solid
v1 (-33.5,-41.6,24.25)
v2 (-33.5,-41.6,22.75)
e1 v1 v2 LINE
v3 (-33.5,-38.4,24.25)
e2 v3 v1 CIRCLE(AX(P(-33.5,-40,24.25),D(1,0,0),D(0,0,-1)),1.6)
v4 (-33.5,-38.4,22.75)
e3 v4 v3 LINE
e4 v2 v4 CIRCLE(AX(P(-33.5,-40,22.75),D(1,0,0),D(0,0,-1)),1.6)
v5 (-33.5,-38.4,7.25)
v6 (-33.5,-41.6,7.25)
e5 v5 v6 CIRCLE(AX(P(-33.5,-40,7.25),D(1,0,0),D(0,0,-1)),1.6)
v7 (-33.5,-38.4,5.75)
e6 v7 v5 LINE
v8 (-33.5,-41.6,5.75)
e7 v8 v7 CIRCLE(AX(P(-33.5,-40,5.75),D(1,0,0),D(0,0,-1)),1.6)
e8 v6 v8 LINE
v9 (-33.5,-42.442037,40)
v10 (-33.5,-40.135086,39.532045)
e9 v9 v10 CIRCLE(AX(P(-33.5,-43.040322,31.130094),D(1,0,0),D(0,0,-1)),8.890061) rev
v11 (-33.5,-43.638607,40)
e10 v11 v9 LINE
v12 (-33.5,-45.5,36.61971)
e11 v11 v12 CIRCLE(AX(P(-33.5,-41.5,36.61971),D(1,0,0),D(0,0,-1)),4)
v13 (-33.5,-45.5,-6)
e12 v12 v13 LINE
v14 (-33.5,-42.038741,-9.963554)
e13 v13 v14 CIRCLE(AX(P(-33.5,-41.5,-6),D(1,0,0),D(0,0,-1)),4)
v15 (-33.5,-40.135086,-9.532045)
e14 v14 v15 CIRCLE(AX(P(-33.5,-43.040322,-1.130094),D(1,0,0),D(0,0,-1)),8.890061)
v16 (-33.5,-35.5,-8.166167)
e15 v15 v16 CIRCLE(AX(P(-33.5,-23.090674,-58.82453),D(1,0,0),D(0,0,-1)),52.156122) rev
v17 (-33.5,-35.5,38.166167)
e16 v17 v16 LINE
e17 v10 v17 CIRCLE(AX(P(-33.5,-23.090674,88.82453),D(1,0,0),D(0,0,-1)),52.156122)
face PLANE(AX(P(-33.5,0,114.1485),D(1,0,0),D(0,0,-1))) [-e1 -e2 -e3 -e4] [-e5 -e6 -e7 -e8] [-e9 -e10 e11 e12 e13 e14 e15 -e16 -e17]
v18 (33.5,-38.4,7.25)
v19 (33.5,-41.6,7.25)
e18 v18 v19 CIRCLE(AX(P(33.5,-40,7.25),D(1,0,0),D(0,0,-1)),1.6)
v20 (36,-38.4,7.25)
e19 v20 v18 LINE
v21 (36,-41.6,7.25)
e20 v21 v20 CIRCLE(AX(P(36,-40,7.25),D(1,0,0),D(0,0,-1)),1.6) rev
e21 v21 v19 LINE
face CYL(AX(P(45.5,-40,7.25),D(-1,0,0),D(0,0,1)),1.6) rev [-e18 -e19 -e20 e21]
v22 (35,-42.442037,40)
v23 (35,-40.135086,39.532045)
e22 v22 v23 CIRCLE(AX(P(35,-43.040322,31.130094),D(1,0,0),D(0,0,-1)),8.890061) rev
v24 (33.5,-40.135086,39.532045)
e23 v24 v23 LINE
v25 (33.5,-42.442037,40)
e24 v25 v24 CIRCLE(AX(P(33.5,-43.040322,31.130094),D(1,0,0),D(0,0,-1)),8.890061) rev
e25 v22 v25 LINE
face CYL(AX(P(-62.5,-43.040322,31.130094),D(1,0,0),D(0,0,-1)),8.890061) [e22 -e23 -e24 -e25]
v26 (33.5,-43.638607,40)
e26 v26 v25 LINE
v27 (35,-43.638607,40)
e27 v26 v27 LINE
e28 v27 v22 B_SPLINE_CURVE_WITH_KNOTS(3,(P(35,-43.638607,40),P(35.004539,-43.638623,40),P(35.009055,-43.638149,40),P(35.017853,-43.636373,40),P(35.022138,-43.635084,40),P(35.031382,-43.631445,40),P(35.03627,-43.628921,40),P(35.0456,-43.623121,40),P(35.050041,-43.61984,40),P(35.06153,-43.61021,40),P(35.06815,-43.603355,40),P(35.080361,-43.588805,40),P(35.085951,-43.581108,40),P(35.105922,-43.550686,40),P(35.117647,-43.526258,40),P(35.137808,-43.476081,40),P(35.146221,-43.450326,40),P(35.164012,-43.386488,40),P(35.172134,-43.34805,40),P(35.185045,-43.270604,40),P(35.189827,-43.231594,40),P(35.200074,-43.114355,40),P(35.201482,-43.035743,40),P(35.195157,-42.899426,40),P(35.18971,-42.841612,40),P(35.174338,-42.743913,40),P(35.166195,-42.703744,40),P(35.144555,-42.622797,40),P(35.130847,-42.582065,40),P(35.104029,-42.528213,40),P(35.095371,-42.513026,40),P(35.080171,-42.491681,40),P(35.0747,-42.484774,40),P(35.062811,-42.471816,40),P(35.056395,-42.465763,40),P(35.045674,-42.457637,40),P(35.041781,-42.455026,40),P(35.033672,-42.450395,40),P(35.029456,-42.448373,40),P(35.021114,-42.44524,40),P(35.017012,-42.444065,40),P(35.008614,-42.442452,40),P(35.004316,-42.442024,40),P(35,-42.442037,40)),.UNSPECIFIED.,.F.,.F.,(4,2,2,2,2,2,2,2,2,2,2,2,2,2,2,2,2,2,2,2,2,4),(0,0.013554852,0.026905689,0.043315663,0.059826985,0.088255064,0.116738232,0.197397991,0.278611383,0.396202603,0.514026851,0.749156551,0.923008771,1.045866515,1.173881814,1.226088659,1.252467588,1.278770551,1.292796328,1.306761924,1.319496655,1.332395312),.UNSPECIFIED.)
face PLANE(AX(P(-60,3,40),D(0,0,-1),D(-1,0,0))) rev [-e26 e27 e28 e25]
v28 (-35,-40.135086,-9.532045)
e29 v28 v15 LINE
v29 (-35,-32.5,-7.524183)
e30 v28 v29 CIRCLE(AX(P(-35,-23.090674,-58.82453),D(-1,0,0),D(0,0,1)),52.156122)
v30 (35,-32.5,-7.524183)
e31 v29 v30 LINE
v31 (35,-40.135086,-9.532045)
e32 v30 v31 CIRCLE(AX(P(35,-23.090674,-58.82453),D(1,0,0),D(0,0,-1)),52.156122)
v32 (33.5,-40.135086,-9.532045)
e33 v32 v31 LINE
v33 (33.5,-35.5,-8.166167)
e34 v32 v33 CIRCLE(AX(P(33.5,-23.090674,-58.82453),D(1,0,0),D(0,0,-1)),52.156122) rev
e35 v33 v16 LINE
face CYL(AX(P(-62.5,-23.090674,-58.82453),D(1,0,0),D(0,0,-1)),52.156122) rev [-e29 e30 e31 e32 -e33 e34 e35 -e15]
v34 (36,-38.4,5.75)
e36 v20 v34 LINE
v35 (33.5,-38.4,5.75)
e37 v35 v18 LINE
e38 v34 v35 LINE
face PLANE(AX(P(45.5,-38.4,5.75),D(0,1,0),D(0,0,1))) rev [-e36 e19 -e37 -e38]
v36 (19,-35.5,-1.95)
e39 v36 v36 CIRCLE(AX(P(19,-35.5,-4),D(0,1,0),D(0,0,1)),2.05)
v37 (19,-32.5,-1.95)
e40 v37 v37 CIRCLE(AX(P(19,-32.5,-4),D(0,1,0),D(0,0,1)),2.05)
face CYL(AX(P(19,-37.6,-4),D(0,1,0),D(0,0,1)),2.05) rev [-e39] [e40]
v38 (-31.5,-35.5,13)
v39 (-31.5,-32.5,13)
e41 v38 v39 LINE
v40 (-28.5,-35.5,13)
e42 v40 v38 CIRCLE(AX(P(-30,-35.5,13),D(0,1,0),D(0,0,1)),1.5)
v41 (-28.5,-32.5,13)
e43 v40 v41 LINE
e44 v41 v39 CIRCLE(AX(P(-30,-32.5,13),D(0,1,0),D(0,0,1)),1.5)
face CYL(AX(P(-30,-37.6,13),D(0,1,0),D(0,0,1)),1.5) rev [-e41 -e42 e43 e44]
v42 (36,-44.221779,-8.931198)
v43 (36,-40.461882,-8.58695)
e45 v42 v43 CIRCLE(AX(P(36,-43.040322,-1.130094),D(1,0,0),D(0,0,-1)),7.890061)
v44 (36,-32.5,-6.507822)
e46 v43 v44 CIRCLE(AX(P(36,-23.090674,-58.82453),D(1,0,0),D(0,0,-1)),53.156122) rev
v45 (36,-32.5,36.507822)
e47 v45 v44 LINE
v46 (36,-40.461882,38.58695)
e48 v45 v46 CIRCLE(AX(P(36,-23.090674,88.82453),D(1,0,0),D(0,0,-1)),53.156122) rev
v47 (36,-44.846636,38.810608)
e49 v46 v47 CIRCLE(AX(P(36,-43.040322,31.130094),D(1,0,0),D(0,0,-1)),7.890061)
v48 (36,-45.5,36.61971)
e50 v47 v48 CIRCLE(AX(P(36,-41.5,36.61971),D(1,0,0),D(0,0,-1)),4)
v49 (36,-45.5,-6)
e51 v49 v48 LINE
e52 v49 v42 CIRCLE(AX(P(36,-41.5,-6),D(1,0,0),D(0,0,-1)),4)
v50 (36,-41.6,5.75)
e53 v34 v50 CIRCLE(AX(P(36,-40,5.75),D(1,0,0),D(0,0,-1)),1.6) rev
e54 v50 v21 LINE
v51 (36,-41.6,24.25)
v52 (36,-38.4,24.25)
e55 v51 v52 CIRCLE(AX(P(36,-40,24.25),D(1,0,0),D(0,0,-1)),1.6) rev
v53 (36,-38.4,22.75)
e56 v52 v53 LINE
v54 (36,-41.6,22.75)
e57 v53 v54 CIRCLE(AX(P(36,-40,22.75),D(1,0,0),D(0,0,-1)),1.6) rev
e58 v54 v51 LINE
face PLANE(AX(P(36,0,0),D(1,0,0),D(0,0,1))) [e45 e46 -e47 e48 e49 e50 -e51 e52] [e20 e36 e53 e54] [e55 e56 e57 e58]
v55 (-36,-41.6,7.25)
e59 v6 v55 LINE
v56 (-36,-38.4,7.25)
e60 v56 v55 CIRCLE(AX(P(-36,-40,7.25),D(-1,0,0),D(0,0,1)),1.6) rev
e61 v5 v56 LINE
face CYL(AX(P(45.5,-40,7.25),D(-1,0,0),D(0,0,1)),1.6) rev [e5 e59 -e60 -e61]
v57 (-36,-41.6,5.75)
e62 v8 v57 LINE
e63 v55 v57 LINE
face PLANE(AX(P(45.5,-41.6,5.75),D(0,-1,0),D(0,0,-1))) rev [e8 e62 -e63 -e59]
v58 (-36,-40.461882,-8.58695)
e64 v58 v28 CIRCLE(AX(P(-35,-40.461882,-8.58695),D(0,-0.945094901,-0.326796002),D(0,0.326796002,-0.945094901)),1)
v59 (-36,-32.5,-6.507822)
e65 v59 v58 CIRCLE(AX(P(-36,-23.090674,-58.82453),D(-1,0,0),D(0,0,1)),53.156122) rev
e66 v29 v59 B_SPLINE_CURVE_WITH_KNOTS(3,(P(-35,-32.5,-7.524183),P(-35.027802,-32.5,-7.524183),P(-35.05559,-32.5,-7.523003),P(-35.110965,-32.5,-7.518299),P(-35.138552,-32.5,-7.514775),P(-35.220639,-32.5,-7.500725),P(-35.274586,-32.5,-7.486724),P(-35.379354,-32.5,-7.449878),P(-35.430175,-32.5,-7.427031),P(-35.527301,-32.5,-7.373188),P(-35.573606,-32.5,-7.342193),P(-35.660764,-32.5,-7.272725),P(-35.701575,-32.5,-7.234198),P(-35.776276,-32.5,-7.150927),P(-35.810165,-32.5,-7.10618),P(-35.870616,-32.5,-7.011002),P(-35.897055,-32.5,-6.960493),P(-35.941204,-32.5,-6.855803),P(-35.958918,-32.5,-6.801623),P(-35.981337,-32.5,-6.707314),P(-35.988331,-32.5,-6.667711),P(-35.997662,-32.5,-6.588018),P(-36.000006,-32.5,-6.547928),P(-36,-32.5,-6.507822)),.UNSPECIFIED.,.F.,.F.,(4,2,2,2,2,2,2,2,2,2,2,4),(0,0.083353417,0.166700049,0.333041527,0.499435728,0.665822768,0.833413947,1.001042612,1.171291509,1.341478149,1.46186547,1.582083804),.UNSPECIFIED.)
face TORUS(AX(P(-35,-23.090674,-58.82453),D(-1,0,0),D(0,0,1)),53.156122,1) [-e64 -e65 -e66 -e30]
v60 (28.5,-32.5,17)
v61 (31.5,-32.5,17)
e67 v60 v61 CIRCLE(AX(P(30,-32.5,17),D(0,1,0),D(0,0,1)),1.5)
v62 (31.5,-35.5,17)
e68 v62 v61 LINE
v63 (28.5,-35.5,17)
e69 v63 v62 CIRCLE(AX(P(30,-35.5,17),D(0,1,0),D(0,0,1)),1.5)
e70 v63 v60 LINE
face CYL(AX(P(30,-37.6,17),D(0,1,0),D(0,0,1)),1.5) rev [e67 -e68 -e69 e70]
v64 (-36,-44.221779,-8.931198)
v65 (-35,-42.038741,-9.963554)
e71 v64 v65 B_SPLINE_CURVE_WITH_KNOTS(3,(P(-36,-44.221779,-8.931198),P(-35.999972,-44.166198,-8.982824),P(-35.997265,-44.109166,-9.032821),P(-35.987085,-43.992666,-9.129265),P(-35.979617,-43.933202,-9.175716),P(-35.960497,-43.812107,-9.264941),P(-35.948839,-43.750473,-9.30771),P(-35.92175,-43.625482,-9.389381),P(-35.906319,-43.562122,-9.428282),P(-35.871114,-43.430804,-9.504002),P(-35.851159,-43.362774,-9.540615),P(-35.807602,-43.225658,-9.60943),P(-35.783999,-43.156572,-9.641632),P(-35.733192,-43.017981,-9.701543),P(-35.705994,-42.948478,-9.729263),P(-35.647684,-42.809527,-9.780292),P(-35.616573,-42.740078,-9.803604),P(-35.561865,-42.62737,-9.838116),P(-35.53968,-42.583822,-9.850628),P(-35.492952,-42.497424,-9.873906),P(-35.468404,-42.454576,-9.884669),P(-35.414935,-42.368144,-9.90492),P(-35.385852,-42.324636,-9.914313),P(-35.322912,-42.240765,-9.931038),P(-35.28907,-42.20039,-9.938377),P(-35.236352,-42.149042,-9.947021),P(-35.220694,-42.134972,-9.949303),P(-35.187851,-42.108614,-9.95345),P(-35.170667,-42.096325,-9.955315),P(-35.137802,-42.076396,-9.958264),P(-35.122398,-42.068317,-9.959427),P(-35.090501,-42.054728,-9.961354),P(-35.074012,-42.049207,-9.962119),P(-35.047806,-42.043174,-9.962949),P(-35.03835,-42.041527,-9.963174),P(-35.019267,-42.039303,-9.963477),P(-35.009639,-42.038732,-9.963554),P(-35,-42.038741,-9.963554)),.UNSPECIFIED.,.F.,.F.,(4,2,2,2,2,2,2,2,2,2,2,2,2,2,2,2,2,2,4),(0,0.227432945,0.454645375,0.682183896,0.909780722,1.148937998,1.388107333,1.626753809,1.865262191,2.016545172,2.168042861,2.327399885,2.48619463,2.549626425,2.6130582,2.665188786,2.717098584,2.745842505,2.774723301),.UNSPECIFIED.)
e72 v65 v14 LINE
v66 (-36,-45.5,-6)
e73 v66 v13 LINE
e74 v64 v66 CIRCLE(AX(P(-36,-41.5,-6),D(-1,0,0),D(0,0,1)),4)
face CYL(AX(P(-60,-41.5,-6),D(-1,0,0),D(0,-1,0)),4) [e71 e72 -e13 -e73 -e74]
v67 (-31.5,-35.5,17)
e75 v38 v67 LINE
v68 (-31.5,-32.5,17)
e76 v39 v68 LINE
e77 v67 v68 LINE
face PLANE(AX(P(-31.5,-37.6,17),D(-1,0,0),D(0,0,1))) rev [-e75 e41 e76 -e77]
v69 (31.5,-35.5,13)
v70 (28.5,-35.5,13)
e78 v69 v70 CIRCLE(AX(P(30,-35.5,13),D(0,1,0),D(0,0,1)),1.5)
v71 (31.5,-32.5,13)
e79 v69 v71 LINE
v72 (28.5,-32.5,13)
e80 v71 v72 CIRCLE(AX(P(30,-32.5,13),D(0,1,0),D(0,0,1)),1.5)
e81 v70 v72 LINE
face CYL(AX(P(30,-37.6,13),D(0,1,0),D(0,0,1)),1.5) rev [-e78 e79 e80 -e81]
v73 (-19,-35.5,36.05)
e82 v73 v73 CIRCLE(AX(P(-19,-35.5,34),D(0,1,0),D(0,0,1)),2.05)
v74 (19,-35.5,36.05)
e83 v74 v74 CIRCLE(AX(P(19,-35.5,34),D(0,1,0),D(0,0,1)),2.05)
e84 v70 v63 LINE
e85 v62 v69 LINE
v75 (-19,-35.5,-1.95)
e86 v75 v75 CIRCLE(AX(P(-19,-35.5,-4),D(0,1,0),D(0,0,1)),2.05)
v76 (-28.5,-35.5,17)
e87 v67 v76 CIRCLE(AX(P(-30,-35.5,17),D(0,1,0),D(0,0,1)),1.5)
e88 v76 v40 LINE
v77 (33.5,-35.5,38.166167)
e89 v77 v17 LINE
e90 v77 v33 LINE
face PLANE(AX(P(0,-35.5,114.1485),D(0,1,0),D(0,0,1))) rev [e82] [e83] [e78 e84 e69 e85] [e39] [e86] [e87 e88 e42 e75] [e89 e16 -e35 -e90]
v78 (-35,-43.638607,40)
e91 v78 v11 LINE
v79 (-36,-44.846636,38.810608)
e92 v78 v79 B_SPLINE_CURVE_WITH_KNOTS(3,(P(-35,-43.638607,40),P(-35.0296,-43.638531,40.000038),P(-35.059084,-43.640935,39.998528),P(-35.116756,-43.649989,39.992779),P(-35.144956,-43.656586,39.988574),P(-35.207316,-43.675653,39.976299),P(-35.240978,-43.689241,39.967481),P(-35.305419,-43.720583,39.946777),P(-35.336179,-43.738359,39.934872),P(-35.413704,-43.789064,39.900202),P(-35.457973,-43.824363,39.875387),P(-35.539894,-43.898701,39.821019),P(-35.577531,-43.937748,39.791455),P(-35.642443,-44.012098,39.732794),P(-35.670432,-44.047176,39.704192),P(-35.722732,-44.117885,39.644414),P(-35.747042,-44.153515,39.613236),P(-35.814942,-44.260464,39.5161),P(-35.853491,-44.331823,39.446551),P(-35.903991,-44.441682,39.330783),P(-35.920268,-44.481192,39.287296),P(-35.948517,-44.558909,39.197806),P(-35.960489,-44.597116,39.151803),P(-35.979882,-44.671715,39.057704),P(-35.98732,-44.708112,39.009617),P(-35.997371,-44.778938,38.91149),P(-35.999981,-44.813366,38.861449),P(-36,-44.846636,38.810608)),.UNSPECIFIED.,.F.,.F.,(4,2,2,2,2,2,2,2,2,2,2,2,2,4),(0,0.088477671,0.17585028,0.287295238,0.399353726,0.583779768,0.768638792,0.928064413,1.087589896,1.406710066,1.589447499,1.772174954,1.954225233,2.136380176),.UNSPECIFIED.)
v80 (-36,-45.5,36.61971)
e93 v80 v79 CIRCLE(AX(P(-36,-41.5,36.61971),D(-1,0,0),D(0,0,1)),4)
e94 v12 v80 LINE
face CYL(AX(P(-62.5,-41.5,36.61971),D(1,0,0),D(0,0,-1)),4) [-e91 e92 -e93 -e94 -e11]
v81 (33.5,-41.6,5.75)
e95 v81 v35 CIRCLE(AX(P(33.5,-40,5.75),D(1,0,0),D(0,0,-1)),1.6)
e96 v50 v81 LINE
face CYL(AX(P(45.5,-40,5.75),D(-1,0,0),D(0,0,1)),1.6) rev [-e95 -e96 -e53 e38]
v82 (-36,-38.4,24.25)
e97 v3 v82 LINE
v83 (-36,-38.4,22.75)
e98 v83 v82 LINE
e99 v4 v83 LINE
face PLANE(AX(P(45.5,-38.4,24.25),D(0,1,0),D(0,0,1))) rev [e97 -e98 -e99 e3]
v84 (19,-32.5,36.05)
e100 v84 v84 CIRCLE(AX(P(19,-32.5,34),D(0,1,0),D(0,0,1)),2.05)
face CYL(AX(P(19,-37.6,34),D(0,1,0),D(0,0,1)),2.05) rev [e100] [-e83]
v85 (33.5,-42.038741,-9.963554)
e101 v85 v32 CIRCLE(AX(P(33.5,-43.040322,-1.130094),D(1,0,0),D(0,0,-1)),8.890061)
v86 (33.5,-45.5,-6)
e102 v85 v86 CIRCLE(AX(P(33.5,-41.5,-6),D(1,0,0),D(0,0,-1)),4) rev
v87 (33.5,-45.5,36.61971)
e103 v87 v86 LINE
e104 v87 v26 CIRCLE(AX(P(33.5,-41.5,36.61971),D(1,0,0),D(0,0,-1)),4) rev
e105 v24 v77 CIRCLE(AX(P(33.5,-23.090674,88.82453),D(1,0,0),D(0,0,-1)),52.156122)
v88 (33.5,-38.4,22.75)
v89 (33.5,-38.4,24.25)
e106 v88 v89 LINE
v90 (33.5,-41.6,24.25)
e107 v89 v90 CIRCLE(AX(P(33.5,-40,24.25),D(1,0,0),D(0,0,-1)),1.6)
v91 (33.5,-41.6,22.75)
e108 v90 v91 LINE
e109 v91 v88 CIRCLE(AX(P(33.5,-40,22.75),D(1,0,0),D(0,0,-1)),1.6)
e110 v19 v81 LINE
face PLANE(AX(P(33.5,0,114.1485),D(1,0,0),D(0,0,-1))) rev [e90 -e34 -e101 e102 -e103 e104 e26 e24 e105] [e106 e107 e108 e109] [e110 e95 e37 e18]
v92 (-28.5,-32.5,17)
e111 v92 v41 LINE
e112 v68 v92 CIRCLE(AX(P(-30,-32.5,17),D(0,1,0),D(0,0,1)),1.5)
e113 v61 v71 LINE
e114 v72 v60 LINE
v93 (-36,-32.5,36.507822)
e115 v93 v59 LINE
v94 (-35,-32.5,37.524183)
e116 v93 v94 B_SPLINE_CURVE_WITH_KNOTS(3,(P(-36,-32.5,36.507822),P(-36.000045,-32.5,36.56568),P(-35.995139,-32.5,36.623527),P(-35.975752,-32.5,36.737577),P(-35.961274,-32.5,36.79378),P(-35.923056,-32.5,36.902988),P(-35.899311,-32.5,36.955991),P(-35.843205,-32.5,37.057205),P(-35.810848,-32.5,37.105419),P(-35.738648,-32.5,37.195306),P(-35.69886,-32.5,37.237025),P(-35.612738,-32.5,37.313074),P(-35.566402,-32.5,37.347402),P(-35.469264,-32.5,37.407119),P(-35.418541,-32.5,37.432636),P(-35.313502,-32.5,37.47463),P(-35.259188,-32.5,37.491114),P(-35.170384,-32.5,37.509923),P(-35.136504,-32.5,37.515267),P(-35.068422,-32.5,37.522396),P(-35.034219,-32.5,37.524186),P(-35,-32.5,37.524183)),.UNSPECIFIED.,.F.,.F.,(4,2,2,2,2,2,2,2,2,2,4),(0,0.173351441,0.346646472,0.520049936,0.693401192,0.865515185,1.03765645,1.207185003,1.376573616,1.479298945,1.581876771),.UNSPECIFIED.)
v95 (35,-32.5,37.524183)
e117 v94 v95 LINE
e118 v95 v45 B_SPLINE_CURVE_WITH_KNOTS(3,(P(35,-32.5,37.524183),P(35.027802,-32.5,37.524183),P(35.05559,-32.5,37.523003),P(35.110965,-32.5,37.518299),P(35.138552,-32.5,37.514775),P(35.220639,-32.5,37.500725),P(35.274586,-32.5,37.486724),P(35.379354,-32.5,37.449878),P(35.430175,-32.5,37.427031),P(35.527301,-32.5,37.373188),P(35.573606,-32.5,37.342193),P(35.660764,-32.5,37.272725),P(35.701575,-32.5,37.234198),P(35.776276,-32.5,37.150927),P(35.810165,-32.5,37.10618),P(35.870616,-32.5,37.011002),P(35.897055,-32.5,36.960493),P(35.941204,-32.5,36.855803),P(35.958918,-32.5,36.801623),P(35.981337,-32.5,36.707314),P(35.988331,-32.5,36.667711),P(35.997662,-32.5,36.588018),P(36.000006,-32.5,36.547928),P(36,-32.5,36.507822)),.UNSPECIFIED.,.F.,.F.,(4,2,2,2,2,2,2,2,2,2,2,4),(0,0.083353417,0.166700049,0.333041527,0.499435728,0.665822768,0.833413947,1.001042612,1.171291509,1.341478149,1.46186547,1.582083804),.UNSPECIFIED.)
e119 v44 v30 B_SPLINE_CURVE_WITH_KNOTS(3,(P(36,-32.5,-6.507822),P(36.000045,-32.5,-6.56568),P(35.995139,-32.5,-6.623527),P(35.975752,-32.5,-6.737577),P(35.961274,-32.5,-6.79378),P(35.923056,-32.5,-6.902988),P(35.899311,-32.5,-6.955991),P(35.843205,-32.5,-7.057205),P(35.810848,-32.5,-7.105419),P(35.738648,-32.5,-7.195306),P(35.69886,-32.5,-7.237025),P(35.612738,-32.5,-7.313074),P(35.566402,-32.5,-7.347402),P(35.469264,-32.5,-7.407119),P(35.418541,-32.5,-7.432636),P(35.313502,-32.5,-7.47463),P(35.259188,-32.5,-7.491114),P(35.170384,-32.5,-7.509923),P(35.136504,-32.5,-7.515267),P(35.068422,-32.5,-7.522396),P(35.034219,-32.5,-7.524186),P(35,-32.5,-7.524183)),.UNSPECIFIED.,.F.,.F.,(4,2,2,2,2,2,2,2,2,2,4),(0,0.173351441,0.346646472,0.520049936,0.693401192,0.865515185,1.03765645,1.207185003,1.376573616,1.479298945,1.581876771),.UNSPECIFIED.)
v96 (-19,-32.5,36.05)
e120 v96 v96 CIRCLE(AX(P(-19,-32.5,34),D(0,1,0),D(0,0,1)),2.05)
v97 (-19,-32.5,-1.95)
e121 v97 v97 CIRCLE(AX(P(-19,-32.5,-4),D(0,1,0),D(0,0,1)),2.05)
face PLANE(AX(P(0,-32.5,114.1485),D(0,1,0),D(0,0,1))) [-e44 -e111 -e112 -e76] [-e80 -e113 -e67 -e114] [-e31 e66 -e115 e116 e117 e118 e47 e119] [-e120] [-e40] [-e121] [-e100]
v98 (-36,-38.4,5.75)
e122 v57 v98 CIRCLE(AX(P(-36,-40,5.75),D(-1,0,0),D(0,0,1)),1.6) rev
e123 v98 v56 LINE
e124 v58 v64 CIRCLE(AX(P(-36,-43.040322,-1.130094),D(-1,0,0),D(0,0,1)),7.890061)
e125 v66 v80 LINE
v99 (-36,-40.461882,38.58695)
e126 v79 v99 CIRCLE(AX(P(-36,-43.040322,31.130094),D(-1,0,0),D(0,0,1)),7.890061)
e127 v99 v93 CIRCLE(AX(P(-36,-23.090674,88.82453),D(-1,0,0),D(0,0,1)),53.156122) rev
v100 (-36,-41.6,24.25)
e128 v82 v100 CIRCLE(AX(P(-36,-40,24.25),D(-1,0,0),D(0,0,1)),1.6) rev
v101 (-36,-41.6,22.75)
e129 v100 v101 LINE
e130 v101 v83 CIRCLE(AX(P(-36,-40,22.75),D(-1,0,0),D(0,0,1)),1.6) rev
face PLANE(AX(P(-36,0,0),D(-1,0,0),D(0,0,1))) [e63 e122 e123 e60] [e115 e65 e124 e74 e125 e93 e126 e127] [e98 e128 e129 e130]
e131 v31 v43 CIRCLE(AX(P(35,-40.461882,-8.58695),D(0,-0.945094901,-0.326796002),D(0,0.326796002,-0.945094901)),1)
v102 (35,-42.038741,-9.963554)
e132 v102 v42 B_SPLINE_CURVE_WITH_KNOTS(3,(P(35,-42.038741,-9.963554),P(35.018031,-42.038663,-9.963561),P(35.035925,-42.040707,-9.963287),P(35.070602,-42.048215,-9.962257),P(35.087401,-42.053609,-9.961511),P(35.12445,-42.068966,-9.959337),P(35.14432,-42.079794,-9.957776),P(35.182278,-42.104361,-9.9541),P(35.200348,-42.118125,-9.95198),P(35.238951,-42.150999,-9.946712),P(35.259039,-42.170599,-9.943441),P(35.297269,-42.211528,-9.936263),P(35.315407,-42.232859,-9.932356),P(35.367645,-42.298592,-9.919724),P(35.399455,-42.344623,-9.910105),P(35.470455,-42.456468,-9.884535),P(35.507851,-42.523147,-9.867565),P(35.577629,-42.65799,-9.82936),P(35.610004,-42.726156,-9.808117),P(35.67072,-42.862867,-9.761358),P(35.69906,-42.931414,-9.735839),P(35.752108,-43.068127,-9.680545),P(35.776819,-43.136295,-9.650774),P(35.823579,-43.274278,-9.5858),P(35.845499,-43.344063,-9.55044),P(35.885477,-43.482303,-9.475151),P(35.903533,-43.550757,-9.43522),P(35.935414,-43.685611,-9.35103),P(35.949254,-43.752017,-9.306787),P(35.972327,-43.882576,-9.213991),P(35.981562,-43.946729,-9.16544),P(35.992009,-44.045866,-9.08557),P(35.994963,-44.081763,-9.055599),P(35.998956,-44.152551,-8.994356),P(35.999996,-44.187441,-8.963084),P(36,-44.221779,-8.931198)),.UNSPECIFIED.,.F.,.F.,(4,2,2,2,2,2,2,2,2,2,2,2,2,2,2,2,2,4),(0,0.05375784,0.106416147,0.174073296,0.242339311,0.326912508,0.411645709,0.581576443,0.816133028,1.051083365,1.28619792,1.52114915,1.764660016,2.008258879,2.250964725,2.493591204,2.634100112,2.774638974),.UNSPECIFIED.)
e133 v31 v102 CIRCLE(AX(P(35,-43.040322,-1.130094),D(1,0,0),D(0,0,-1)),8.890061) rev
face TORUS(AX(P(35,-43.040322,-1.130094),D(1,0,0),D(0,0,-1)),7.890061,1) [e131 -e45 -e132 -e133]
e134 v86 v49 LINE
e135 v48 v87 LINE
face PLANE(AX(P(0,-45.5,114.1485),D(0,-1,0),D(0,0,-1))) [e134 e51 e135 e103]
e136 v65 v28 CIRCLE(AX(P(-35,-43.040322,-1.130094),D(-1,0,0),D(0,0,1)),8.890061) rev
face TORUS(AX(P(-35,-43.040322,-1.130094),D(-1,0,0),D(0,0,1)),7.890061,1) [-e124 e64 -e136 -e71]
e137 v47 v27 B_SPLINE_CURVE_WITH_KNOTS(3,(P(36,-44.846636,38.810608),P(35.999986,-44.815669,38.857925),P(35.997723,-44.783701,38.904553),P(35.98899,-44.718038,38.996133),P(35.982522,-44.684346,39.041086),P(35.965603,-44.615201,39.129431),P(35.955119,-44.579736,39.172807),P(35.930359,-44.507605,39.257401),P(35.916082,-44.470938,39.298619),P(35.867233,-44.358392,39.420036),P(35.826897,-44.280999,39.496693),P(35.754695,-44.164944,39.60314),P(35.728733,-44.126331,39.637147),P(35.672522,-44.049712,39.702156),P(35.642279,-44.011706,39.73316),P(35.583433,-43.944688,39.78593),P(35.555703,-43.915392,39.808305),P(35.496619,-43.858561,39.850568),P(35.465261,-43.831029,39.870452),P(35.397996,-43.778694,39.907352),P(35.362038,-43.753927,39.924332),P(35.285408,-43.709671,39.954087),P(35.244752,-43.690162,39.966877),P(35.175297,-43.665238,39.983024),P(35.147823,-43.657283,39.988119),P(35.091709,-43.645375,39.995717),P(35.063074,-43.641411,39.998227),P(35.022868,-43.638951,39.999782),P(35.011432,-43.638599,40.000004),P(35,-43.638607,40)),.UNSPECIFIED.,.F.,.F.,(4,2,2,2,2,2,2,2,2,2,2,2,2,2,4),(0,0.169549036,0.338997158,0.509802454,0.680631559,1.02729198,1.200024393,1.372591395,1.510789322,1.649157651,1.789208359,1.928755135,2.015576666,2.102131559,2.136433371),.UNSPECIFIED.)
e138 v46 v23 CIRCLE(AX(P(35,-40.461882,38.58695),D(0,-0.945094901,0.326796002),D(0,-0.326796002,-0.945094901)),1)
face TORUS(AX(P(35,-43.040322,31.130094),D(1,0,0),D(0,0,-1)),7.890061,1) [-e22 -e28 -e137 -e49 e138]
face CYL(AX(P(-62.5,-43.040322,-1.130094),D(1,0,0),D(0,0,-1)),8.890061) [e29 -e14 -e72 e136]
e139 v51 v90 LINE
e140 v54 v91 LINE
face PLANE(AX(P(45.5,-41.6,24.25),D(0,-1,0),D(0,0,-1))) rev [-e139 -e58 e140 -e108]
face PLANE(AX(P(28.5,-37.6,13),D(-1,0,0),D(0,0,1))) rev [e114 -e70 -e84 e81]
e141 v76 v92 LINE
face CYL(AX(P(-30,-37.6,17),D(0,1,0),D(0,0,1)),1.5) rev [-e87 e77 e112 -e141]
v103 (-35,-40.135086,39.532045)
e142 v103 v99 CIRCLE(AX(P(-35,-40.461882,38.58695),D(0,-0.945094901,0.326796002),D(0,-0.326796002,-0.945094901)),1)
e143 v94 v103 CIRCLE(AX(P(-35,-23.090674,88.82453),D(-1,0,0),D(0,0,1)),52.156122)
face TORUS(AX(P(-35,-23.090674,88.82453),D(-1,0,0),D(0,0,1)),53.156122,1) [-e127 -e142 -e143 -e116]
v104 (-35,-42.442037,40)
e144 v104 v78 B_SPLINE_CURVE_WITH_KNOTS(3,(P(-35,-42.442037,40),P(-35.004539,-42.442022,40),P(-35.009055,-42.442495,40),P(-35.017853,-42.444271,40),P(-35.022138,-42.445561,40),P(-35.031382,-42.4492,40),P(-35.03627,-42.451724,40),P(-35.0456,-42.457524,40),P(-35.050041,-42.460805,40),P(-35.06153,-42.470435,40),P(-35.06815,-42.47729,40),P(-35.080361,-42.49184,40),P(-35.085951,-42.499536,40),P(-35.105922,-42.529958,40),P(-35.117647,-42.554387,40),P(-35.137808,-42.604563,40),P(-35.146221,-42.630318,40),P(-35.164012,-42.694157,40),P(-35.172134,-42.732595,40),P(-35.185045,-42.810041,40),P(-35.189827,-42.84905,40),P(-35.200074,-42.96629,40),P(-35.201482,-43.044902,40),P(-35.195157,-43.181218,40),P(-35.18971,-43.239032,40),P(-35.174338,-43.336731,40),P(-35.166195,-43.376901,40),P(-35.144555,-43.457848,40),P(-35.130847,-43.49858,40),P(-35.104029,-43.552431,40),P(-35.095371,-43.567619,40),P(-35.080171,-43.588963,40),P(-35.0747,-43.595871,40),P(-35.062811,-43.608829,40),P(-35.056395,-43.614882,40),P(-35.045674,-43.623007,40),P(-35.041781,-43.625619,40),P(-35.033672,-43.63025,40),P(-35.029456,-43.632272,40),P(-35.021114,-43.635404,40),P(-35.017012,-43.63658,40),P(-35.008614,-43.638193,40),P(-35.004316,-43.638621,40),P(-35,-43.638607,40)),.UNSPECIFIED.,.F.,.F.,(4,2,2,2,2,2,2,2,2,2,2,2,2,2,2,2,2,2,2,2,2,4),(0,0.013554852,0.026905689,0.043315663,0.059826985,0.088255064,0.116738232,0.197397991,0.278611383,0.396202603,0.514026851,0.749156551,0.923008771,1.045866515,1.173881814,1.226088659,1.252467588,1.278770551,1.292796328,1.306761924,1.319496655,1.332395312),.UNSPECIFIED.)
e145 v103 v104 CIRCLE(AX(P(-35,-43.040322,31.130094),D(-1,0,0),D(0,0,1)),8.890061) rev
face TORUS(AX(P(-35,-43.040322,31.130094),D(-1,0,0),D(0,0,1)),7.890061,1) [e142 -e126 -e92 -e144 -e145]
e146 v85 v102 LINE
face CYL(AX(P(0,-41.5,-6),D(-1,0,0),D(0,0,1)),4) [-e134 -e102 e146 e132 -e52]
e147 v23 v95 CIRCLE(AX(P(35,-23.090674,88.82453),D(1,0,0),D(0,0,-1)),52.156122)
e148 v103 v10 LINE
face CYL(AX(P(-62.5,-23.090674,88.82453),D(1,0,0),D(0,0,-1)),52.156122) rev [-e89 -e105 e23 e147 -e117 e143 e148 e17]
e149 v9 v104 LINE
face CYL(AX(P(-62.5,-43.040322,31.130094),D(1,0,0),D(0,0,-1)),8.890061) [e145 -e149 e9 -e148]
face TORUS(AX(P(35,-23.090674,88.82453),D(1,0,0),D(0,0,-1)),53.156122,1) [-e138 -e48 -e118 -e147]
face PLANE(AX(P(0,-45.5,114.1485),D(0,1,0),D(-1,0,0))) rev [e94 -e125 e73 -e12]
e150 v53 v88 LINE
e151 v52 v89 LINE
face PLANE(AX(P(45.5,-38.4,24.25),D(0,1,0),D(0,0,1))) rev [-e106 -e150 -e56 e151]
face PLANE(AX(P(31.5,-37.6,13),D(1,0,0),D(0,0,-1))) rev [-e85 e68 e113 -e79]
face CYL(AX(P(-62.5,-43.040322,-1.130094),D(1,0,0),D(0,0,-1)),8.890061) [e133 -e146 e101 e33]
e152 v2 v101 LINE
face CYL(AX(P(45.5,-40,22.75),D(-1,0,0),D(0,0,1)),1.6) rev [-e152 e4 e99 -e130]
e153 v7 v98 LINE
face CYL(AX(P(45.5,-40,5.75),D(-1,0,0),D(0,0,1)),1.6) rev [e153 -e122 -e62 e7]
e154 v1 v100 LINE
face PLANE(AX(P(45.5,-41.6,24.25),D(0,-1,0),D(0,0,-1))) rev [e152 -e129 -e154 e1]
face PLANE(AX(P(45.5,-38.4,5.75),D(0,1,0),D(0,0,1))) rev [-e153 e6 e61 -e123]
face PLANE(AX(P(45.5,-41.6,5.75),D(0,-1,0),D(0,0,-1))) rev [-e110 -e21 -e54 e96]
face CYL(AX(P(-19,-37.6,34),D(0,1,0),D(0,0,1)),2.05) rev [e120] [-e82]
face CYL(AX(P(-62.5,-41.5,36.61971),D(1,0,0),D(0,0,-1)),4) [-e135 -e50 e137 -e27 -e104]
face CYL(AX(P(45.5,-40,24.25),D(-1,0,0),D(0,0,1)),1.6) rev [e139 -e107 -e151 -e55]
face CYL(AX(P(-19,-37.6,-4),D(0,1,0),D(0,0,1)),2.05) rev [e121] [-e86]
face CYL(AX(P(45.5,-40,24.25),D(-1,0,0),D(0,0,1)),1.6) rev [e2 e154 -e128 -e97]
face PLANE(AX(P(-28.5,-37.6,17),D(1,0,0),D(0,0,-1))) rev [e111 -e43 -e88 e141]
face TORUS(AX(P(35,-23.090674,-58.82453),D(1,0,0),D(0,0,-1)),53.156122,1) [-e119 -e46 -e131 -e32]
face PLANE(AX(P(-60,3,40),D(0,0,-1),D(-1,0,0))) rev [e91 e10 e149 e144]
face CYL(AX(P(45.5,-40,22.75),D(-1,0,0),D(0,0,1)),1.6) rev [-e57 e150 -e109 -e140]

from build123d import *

# Parameters (mm, degrees)
BOSS_EXTRUDE1_DEPTH      = 40
BOSS_EXTRUDE1_DEPTH_BACK = 10
SKETCH1_W                = 73
SKETCH1_H                = 3
SKETCH1_W_2              = 3
SKETCH1_H_2              = 10
SKETCH5_R                = 2.05
CUT_EXTRUDE2_DEPTH       = 5.1
CUT_EXTRUDE3_DEPTH       = 82
SKETCH9_W                = 50
SKETCH9_H                = 13
CUT_EXTRUDE4_DEPTH       = 0.5
CUT_EXTRUDE5_DEPTH       = 98.5
FILLET2_R                = 4
FILLET3_R                = 1


with BuildPart() as part:
    # Sketch1 → Boss-Extrude1 (new, two sides: drawn at the far end of the back side and taken through both)
    with BuildSketch(Plane.XY.offset(-BOSS_EXTRUDE1_DEPTH_BACK)):
        with Locations((0, -34)):
            Rectangle(SKETCH1_W, SKETCH1_H)
        with Locations((35, -40.5)):
            Rectangle(SKETCH1_W_2, SKETCH1_H_2)
        with Locations((-35, -40.5)):
            Rectangle(SKETCH1_W_2, SKETCH1_H_2)
    extrude(amount=BOSS_EXTRUDE1_DEPTH + BOSS_EXTRUDE1_DEPTH_BACK)

    # Sketch5 → Cut-Extrude2 (cut)
    with BuildSketch(Plane(origin=(0, -32.5, 0), x_dir=(1, 0, 0), z_dir=(0, 1, 0))):
        with Locations(Location((-19, 4, 0), (0, 0, 270))):
            Circle(SKETCH5_R)
        with Locations(Location((19, 4, 0), (0, 0, 270))):
            Circle(SKETCH5_R)
        with Locations(Location((19, -34, 0), (0, 0, 270))):
            Circle(SKETCH5_R)
        with Locations(Location((-19, -34, 0), (0, 0, 270))):
            Circle(SKETCH5_R)
        with BuildLine():
            Line((-31.5, -17), (-31.5, -13))
            ThreePointArc((-31.5, -13), (-30, -11.5), (-28.5, -13))
            Line((-28.5, -13), (-28.5, -17))
            ThreePointArc((-28.5, -17), (-30, -18.5), (-31.5, -17))
        make_face()
        with BuildLine():
            Line((31.5, -13), (31.5, -17))
            ThreePointArc((31.5, -17), (30, -18.5), (28.5, -17))
            Line((28.5, -17), (28.5, -13))
            ThreePointArc((28.5, -13), (30, -11.5), (31.5, -13))
        make_face()
    extrude(amount=-CUT_EXTRUDE2_DEPTH, mode=Mode.SUBTRACT)

    # Sketch8 → Cut-Extrude3 (cut)
    with BuildSketch(Plane.ZY.offset(36.5)):
        with BuildLine():
            Line((5.75, -38.4), (7.25, -38.4))
            ThreePointArc((7.25, -38.4), (8.85, -40), (7.25, -41.6))
            Line((7.25, -41.6), (5.75, -41.6))
            ThreePointArc((5.75, -41.6), (4.15, -40), (5.75, -38.4))
        make_face()
        with BuildLine():
            Line((24.25, -38.4), (22.75, -38.4))
            ThreePointArc((22.75, -38.4), (21.15, -40), (22.75, -41.6))
            Line((22.75, -41.6), (24.25, -41.6))
            ThreePointArc((24.25, -41.6), (25.85, -40), (24.25, -38.4))
        make_face()
    extrude(amount=-CUT_EXTRUDE3_DEPTH, mode=Mode.SUBTRACT)

    # Sketch9 → Cut-Extrude4 (cut)
    with BuildSketch(Plane.ZY.offset(36.5)):
        with Locations((15, -39)):
            Rectangle(SKETCH9_W, SKETCH9_H)
    cut_extrude4 = extrude(amount=-CUT_EXTRUDE4_DEPTH, mode=Mode.SUBTRACT)

    # Mirror1: Cut-Extrude4 across plane
    add(cut_extrude4.mirror(Plane(origin=(0, 0, 0), x_dir=(0, 0, 1), z_dir=(1, 0, 0))), mode=Mode.SUBTRACT)

    # Sketch10 → Cut-Extrude5 (cut)
    with BuildSketch(Plane(origin=(36, 0, 0), x_dir=(0, 0, -1), z_dir=(1, 0, 0))):
        with BuildLine():
            Line((-39.673112404, -45.5), (-40.667568966, -46.550213702))
            Line((-40.667568966, -46.550213702), (-44.63224415, -43))
            Line((-44.63224415, -43), (-42.018495325, -33.98072497))
            Line((-42.018495325, -33.98072497), (-39.463482429, -29.927945893))
            Line((-39.463482429, -29.927945893), (-37.524182533, -32.5))
            ThreePointArc((-37.524182533, -32.5), (-38.383444331, -36.355587887), (-39.532044935, -40.135085929))
            ThreePointArc((-39.532044935, -40.135085929), (-40.017082913, -42.806643803), (-39.673112404, -45.5))
        make_face()
    cut_extrude5 = extrude(amount=-CUT_EXTRUDE5_DEPTH, mode=Mode.SUBTRACT)

    # Fillet2
    # the kernel refuses this fillet: 4 mm, written as the material it takes off along each edge
    with BuildSketch(Plane(origin=(23.5, -45.5, -10), x_dir=(0, 1, 0), z_dir=(1, 0, 0)), Plane(origin=(-46, -45.5, -10), x_dir=(0, 1, 0), z_dir=(1, 0, 0))) as fillet2_piece_1:
        with BuildLine():
            CenterArc((FILLET2_R, FILLET2_R), FILLET2_R, 180, 90)
            Line((0, FILLET2_R), (-FILLET2_R * 0.02, FILLET2_R))
            Line((-FILLET2_R * 0.02, FILLET2_R), (-FILLET2_R * 0.02, -FILLET2_R * 0.02))
            Line((-FILLET2_R * 0.02, -FILLET2_R * 0.02), (FILLET2_R, -FILLET2_R * 0.02))
            Line((FILLET2_R, -FILLET2_R * 0.02), (FILLET2_R, 0))
        make_face()
    extrude(amount=22.5, mode=Mode.SUBTRACT)
    with BuildSketch(Plane(origin=(43.633505106, -45.5, 39.673112404), x_dir=(0, 0, -1), z_dir=(-1, 0, 0)), Plane(origin=(-25.866494894, -45.5, 39.673112404), x_dir=(0, 0, -1), z_dir=(-1, 0, 0))) as fillet2_piece_2:
        with BuildLine():
            CenterArc((3.053402042, -4), FILLET2_R, 90, 57.679694788)
            Line((-0.326887596, -1.861392518), (-0.394493388, -1.818620368))
            ThreePointArc((-0.394493388, -1.818620368), (-0.291841099, -0.908147826), (-0.076877032, 0.022134181))
            Line((-0.076877032, 0.022134181), (0, 0.08))
            Line((0, 0.08), (3.053402042, 0.08))
            Line((3.053402042, 0.08), (3.053402042, 0))
        make_face()
    extrude(amount=17.767010212, mode=Mode.SUBTRACT)

    # Mirror2: Cut-Extrude5 across plane
    add(cut_extrude5.mirror(Plane.XY.offset(15)), mode=Mode.SUBTRACT)

    # Fillet3
    # the kernel refuses this fillet: 1 mm, written as the material it takes off along each edge
    with BuildSketch(Plane(origin=(36, -43.040322305, -1.130093667), x_dir=(0, 0.32679600244698914, -0.9450949014700414), z_dir=(0, 0.9450949014700414, 0.32679600244698914))) as fillet3_piece_1:
        with BuildLine():
            CenterArc((8.890060939 - FILLET3_R, FILLET3_R), FILLET3_R, 270, 90)
            Line((8.890060939 - FILLET3_R, 0), (8.890060939 - FILLET3_R, -FILLET3_R * 0.02))
            Line((8.890060939 - FILLET3_R, -FILLET3_R * 0.02), (8.890060939 + FILLET3_R * 0.02, -FILLET3_R * 0.02))
            Line((8.890060939 + FILLET3_R * 0.02, -FILLET3_R * 0.02), (8.890060939 + FILLET3_R * 0.02, FILLET3_R))
            Line((8.890060939 + FILLET3_R * 0.02, FILLET3_R), (8.890060939, FILLET3_R))
        make_face()
    revolve(axis=Axis((36, -43.040322305, -1.130093667), (-1, 0, 0)), revolution_arc=51.275424055, mode=Mode.SUBTRACT)
    with BuildSketch(Plane(origin=(36, -43.040322305, 31.130093667), x_dir=(0, 0.32679600244698914, 0.9450949014700414), z_dir=(0, 0.9450949014700414, -0.32679600244698914))) as fillet3_piece_2:
        with BuildLine():
            CenterArc((8.890060939 - FILLET3_R, -FILLET3_R), FILLET3_R, 0, 90)
            Line((8.890060939 - FILLET3_R, 0), (8.890060939 - FILLET3_R, FILLET3_R * 0.02))
            Line((8.890060939 - FILLET3_R, FILLET3_R * 0.02), (8.890060939 + FILLET3_R * 0.02, FILLET3_R * 0.02))
            Line((8.890060939 + FILLET3_R * 0.02, FILLET3_R * 0.02), (8.890060939 + FILLET3_R * 0.02, -FILLET3_R))
            Line((8.890060939 + FILLET3_R * 0.02, -FILLET3_R), (8.890060939, -FILLET3_R))
        make_face()
    revolve(axis=Axis((36, -43.040322305, 31.130093667), (1, 0, 0)), revolution_arc=53.885597182, mode=Mode.SUBTRACT)
    with BuildSketch(Plane(origin=(-36, -43.040322305, -1.130093667), x_dir=(0, -0.532891092697407, -0.8461838354186183), z_dir=(0, -0.8461838354186183, 0.532891092697407))) as fillet3_piece_3:
        with BuildLine():
            CenterArc((8.890060939 - FILLET3_R, FILLET3_R), FILLET3_R, 270, 90)
            Line((8.890060939, FILLET3_R), (8.890060939 + FILLET3_R * 0.02, FILLET3_R))
            Line((8.890060939 + FILLET3_R * 0.02, FILLET3_R), (8.890060939 + FILLET3_R * 0.02, -FILLET3_R * 0.02))
            Line((8.890060939 + FILLET3_R * 0.02, -FILLET3_R * 0.02), (8.890060939 - FILLET3_R, -FILLET3_R * 0.02))
            Line((8.890060939 - FILLET3_R, -FILLET3_R * 0.02), (8.890060939 - FILLET3_R, 0))
        make_face()
    revolve(axis=Axis((-36, -43.040322305, -1.130093667), (1, 0, 0)), revolution_arc=51.275424055, mode=Mode.SUBTRACT)
    with BuildSketch(Plane(origin=(-36, -43.040322305, 31.130093667), x_dir=(0, 0.32679600244698914, 0.9450949014700414), z_dir=(0, 0.9450949014700414, -0.32679600244698914))) as fillet3_piece_4:
        with BuildLine():
            CenterArc((8.890060939 - FILLET3_R, FILLET3_R), FILLET3_R, 270, 90)
            Line((8.890060939 - FILLET3_R, 0), (8.890060939 - FILLET3_R, -FILLET3_R * 0.02))
            Line((8.890060939 - FILLET3_R, -FILLET3_R * 0.02), (8.890060939 + FILLET3_R * 0.02, -FILLET3_R * 0.02))
            Line((8.890060939 + FILLET3_R * 0.02, -FILLET3_R * 0.02), (8.890060939 + FILLET3_R * 0.02, FILLET3_R))
            Line((8.890060939 + FILLET3_R * 0.02, FILLET3_R), (8.890060939, FILLET3_R))
        make_face()
    revolve(axis=Axis((-36, -43.040322305, 31.130093667), (1, 0, 0)), revolution_arc=53.885597182, mode=Mode.SUBTRACT)
    with BuildSketch(Plane(origin=(36, -23.090673742, -58.824529959), x_dir=(0, -0.06631180934399998, 0.9977989496594617), z_dir=(0, 0.9977989496594617, 0.06631180934399998))) as fillet3_piece_5:
        with BuildLine():
            CenterArc((52.156122044 + FILLET3_R, -FILLET3_R), FILLET3_R, 90, 90)
            Line((52.156122044 + FILLET3_R, 0), (52.156122044 + FILLET3_R, FILLET3_R * 0.02))
            Line((52.156122044 + FILLET3_R, FILLET3_R * 0.02), (52.156122044 - FILLET3_R * 0.02, FILLET3_R * 0.02))
            Line((52.156122044 - FILLET3_R * 0.02, FILLET3_R * 0.02), (52.156122044 - FILLET3_R * 0.02, -FILLET3_R))
            Line((52.156122044 - FILLET3_R * 0.02, -FILLET3_R), (52.156122044, -FILLET3_R))
        make_face()
    revolve(axis=Axis((36, -23.090673742, -58.824529959), (1, 0, 0)), revolution_arc=15.272244004, mode=Mode.SUBTRACT)
    with BuildSketch(Plane(origin=(36, -23.090673742, 88.824529959), x_dir=(0, -0.06631180934399998, -0.9977989496594617), z_dir=(0, 0.9977989496594617, -0.06631180934399998))) as fillet3_piece_6:
        with BuildLine():
            CenterArc((52.156122044 + FILLET3_R, FILLET3_R), FILLET3_R, 180, 90)
            Line((52.156122044 + FILLET3_R, 0), (52.156122044 + FILLET3_R, -FILLET3_R * 0.02))
            Line((52.156122044 + FILLET3_R, -FILLET3_R * 0.02), (52.156122044 - FILLET3_R * 0.02, -FILLET3_R * 0.02))
            Line((52.156122044 - FILLET3_R * 0.02, -FILLET3_R * 0.02), (52.156122044 - FILLET3_R * 0.02, FILLET3_R))
            Line((52.156122044 - FILLET3_R * 0.02, FILLET3_R), (52.156122044, FILLET3_R))
        make_face()
    revolve(axis=Axis((36, -23.090673742, 88.824529959), (-1, 0, 0)), revolution_arc=15.272244004, mode=Mode.SUBTRACT)
    with BuildSketch(Plane(origin=(-36, -23.090673742, -58.824529959), x_dir=(0, -0.06631180934399998, 0.9977989496594617), z_dir=(0, 0.9977989496594617, 0.06631180934399998))) as fillet3_piece_7:
        with BuildLine():
            CenterArc((52.156122044 + FILLET3_R, FILLET3_R), FILLET3_R, 180, 90)
            Line((52.156122044 + FILLET3_R, 0), (52.156122044 + FILLET3_R, -FILLET3_R * 0.02))
            Line((52.156122044 + FILLET3_R, -FILLET3_R * 0.02), (52.156122044 - FILLET3_R * 0.02, -FILLET3_R * 0.02))
            Line((52.156122044 - FILLET3_R * 0.02, -FILLET3_R * 0.02), (52.156122044 - FILLET3_R * 0.02, FILLET3_R))
            Line((52.156122044 - FILLET3_R * 0.02, FILLET3_R), (52.156122044, FILLET3_R))
        make_face()
    revolve(axis=Axis((-36, -23.090673742, -58.824529959), (1, 0, 0)), revolution_arc=15.272244004, mode=Mode.SUBTRACT)
    with BuildSketch(Plane(origin=(-36, -23.090673742, 88.824529959), x_dir=(0, -0.32679600244698953, -0.9450949014700414), z_dir=(0, -0.9450949014700414, 0.32679600244698953))) as fillet3_piece_8:
        with BuildLine():
            CenterArc((52.156122044 + FILLET3_R, FILLET3_R), FILLET3_R, 180, 90)
            Line((52.156122044 + FILLET3_R, 0), (52.156122044 + FILLET3_R, -FILLET3_R * 0.02))
            Line((52.156122044 + FILLET3_R, -FILLET3_R * 0.02), (52.156122044 - FILLET3_R * 0.02, -FILLET3_R * 0.02))
            Line((52.156122044 - FILLET3_R * 0.02, -FILLET3_R * 0.02), (52.156122044 - FILLET3_R * 0.02, FILLET3_R))
            Line((52.156122044 - FILLET3_R * 0.02, FILLET3_R), (52.156122044, FILLET3_R))
        make_face()
    revolve(axis=Axis((-36, -23.090673742, 88.824529959), (1, 0, 0)), revolution_arc=15.272244004, mode=Mode.SUBTRACT)


solid = part.part
